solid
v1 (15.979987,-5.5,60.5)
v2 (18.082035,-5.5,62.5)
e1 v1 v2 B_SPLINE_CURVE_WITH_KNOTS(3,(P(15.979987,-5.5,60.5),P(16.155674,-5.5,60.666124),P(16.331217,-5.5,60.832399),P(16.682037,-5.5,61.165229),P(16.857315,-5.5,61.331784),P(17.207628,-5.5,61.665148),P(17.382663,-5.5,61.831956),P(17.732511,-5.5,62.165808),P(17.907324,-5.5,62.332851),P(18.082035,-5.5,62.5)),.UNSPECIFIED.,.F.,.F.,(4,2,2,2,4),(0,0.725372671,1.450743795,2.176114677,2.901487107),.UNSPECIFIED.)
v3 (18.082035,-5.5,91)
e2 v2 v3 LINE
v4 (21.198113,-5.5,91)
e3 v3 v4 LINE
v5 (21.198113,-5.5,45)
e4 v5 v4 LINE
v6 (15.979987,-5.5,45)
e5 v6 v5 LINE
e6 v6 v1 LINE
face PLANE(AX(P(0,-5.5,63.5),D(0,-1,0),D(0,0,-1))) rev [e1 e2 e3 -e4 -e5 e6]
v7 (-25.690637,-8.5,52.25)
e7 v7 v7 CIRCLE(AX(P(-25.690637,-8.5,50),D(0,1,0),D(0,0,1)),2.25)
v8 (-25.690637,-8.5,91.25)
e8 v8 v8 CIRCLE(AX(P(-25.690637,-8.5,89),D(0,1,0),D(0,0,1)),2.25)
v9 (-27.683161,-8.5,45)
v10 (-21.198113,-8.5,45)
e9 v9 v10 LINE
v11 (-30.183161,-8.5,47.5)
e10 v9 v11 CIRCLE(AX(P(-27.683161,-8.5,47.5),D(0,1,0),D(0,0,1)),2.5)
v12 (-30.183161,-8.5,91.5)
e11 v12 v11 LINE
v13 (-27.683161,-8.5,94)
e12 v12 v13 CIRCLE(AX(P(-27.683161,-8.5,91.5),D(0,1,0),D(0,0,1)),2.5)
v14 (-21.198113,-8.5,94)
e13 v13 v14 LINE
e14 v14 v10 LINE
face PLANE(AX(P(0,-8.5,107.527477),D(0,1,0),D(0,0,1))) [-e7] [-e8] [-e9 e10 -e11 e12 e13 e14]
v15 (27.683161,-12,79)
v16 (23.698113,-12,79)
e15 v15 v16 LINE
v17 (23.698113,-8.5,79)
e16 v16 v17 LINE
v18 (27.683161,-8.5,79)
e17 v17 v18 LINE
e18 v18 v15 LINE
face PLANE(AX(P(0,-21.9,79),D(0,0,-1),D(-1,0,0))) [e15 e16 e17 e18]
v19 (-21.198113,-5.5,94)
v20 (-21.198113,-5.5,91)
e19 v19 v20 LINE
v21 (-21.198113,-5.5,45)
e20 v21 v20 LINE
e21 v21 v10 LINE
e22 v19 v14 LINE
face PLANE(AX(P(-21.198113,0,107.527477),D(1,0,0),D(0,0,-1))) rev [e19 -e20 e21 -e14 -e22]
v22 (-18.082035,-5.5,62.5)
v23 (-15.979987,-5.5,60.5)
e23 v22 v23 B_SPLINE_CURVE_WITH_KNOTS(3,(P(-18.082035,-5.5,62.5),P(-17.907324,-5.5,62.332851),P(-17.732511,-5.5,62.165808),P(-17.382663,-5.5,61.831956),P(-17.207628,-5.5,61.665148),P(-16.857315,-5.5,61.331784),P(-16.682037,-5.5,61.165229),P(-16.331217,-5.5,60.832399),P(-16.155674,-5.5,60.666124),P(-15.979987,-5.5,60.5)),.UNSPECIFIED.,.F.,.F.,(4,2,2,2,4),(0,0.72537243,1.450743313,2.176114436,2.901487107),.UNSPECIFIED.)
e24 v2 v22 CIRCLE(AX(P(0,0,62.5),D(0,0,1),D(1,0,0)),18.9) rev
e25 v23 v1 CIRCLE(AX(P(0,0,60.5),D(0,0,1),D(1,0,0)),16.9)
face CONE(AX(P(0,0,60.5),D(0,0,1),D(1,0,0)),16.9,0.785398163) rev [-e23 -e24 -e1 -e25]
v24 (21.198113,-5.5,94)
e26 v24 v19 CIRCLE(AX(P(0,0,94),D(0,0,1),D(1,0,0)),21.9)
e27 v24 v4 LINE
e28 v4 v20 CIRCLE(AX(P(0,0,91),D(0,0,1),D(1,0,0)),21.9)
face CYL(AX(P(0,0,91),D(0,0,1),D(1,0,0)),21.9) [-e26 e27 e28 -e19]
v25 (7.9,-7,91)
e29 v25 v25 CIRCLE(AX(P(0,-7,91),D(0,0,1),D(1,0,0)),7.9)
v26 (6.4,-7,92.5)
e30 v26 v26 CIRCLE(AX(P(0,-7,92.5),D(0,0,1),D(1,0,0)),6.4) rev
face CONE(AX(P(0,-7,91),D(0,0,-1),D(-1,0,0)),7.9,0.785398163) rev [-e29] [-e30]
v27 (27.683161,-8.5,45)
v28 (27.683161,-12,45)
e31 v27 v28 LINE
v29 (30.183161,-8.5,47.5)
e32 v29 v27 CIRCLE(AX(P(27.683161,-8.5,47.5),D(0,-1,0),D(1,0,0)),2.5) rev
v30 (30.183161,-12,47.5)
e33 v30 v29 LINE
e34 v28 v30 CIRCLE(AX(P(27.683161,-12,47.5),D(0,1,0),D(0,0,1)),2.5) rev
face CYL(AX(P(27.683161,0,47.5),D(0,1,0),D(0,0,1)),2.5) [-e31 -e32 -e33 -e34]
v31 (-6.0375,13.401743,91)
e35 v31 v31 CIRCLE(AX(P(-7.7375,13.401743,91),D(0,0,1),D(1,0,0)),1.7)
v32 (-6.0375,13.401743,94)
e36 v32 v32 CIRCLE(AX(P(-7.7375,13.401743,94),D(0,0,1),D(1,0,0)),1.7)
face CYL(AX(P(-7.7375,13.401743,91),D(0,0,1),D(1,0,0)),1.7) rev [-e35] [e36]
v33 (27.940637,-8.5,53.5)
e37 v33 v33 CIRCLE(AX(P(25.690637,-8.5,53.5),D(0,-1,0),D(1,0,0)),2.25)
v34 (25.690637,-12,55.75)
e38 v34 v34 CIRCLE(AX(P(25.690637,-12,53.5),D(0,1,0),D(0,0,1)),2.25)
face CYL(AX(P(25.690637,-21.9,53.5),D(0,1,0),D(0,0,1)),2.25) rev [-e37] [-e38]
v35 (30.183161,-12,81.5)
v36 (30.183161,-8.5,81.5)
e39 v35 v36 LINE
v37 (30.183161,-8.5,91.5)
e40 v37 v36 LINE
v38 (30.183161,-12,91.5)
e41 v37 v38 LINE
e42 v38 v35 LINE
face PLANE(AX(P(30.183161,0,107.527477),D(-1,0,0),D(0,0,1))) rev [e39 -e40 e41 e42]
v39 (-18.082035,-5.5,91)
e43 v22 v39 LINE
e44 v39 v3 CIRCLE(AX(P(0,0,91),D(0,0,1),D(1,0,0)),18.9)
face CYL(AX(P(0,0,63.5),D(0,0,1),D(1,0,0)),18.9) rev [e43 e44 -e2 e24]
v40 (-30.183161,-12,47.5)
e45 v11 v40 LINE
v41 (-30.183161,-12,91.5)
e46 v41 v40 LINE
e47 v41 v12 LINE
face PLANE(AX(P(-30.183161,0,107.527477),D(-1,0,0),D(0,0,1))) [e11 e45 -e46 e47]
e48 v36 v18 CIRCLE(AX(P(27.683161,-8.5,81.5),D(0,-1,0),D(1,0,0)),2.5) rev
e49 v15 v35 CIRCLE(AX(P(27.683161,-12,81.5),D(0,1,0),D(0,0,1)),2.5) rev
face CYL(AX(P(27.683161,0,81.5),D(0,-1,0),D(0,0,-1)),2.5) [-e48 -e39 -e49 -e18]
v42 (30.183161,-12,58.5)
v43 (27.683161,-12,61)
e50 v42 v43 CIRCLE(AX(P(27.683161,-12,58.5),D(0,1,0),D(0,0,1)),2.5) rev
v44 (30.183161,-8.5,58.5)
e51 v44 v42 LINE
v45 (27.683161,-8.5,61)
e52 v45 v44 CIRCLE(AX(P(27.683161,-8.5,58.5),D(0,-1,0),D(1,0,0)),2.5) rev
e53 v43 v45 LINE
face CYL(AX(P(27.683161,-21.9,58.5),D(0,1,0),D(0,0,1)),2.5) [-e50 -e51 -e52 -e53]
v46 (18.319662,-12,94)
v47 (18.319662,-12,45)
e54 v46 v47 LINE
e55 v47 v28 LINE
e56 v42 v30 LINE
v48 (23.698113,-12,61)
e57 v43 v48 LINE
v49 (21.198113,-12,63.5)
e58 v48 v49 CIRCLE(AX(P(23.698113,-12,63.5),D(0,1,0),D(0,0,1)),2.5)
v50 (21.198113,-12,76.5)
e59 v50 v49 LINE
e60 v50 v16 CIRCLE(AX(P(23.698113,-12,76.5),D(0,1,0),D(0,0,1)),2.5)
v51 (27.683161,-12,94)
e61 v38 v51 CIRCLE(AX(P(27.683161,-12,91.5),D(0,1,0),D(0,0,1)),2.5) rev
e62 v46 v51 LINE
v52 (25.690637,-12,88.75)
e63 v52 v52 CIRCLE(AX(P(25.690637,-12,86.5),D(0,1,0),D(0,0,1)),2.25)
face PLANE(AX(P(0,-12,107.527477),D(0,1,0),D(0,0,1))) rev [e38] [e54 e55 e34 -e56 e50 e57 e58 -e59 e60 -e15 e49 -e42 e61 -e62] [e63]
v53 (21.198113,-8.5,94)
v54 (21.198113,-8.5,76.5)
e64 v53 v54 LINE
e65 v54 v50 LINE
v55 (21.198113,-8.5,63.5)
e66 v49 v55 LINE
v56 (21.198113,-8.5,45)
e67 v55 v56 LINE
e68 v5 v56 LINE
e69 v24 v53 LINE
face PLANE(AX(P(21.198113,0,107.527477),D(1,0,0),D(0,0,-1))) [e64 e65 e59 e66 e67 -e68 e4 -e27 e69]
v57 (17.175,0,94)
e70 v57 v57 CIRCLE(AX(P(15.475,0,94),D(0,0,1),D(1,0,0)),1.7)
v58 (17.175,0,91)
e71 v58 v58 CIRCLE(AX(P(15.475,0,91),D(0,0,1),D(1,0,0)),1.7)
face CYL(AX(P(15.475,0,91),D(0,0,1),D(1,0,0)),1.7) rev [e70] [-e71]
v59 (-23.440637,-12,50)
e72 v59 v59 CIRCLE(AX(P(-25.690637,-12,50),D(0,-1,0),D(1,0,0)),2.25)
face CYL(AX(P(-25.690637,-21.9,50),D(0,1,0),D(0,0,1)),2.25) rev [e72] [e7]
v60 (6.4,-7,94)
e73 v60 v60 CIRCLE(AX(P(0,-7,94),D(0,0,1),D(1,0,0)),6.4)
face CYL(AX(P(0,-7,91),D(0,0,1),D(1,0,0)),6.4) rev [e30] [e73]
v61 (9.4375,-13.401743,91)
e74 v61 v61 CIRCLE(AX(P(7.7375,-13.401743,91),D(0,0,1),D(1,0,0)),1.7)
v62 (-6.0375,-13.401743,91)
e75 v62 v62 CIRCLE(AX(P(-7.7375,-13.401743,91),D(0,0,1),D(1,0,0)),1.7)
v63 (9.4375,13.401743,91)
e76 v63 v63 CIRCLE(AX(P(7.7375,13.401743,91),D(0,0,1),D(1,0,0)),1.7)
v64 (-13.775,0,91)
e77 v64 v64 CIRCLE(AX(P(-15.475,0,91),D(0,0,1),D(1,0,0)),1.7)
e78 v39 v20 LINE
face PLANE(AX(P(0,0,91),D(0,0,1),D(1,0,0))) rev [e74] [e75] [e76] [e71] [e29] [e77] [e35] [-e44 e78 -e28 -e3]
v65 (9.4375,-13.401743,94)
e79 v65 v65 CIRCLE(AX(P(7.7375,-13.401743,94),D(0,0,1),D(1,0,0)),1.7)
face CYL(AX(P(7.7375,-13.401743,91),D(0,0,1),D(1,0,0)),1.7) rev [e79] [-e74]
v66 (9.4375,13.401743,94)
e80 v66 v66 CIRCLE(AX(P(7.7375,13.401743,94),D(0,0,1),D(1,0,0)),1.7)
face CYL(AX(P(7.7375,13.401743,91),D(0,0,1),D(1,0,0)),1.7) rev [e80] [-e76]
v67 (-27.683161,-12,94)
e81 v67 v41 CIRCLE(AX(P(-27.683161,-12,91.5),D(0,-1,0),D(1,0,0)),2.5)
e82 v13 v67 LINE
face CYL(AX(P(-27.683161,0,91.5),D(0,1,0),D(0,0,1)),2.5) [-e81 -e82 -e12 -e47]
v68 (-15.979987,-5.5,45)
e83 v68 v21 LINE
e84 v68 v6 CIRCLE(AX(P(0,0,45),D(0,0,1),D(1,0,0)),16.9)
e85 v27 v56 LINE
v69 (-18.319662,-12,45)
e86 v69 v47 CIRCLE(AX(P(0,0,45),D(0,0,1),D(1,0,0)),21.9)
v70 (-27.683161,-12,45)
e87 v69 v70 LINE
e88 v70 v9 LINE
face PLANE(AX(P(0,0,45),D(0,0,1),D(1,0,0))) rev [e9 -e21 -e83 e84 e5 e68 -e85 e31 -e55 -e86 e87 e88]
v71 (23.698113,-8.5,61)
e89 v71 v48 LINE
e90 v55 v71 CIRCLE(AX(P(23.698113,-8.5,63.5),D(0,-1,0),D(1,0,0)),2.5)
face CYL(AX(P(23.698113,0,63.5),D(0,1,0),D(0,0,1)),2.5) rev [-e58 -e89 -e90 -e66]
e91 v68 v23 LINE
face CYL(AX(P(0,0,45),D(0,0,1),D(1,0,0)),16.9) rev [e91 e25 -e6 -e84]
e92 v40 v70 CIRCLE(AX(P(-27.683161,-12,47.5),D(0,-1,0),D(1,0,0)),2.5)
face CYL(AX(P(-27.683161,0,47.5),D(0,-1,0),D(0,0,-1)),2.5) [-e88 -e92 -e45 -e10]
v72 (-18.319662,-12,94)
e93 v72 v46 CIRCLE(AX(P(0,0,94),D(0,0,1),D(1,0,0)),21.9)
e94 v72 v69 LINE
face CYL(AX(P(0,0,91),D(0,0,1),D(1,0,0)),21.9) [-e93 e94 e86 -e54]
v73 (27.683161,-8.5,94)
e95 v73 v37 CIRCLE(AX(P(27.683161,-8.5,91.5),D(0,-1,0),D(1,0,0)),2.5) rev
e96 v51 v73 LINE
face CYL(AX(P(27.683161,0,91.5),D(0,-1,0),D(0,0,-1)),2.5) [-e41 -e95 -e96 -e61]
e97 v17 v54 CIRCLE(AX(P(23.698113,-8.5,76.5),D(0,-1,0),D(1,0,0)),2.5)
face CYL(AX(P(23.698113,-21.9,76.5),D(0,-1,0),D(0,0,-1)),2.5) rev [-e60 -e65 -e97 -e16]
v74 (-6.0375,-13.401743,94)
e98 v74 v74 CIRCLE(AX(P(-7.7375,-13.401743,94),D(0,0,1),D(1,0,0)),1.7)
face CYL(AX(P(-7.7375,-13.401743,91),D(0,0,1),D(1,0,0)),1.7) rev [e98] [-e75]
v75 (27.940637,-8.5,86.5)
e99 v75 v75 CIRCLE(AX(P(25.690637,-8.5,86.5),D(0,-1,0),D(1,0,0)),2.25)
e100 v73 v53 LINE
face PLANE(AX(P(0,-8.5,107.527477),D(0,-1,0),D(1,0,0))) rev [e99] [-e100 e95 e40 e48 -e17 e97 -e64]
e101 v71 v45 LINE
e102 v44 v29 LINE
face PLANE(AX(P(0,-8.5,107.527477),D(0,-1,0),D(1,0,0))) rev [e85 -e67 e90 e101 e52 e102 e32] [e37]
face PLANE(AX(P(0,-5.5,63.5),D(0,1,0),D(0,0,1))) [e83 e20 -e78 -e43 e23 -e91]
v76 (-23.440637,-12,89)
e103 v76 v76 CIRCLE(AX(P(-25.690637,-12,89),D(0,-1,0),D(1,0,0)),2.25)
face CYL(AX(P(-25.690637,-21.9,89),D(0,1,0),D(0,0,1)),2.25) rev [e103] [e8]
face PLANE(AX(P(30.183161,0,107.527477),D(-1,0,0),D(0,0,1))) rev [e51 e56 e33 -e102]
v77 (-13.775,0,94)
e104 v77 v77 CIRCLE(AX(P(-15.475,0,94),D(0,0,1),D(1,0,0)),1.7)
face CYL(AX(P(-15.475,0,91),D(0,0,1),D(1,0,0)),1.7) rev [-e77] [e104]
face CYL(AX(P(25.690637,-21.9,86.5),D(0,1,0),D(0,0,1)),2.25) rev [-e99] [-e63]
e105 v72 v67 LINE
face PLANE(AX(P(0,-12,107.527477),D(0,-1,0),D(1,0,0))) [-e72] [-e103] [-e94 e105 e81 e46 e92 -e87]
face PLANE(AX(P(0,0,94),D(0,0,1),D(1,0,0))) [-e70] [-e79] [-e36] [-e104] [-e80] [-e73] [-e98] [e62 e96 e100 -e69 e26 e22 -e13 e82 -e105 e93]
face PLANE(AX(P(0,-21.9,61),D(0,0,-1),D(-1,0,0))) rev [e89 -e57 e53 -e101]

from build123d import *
from build123d.topology import SkipClean

# Parameters (mm, degrees)
BOSS_EXTRUDE1_START     = 94
SKETCH1_R               = 21.9
SKETCH1_R_2             = 1.7
SKETCH1_R_3             = 6.4
BOSS_EXTRUDE1_DEPTH     = 3
BOSS_EXTRUDE2_START     = 91
BOSS_EXTRUDE2_DEPTH     = 27.5
BOSS_EXTRUDE3_START     = 45
BOSS_EXTRUDE3_DEPTH     = 18.5
BOSS_EXTRUDE7_START     = 94
BOSS_EXTRUDE7_DEPTH     = 49
CUT_EXTRUDE5_DEPTH      = 104.301419283
CUT_EXTRUDE5_DEPTH_BACK = 104.301419283
SKETCH4_W               = 8.985048174
SKETCH4_H               = 18
SKETCH4_R               = 2.25
CHAMFER3_SIZE           = 3
CHAMFER4_SIZE           = 1.5
FILLET2_R               = 2.5


with BuildPart() as part:
    # Sketch1 → Boss-Extrude1 (new body)
    with BuildSketch(Plane.XY.offset(BOSS_EXTRUDE1_START)):
        Circle(SKETCH1_R)
        with Locations((15.475, 0)):
            Circle(SKETCH1_R_2, mode=Mode.SUBTRACT)
        with Locations((7.7375, -13.401743124)):
            Circle(SKETCH1_R_2, mode=Mode.SUBTRACT)
        with Locations((-7.7375, -13.401743124)):
            Circle(SKETCH1_R_2, mode=Mode.SUBTRACT)
        with Locations((-15.475, 0)):
            Circle(SKETCH1_R_2, mode=Mode.SUBTRACT)
        with Locations((-7.7375, 13.401743124)):
            Circle(SKETCH1_R_2, mode=Mode.SUBTRACT)
        with Locations((7.7375, 13.401743124)):
            Circle(SKETCH1_R_2, mode=Mode.SUBTRACT)
        with Locations((0, -7)):
            Circle(SKETCH1_R_3, mode=Mode.SUBTRACT)
    extrude(amount=-BOSS_EXTRUDE1_DEPTH)

    # Sketch1<5> → Boss-Extrude2 (add)
    with BuildSketch(Plane.XY.offset(BOSS_EXTRUDE2_START)):
        with BuildLine():
            ThreePointArc((18.319661569, -12), (19.330787418, -10.292262036), (20.183161298, -8.5))
            Line((20.183161298, -8.5), (16.880758277, -8.5))
            ThreePointArc((16.880758277, -8.5), (0, -18.9), (-16.880758277, -8.5))
            Line((-16.880758277, -8.5), (-20.183161298, -8.5))
            ThreePointArc((-20.183161298, -8.5), (-19.330787418, -10.292262036), (-18.319661569, -12))
            ThreePointArc((-18.319661569, -12), (0, -21.9), (18.319661569, -12))
        make_face()
        with BuildLine():
            Line((-20.183161298, -8.5), (-16.880758277, -8.5))
            ThreePointArc((-16.880758277, -8.5), (-17.545632887, -7.025721786), (-18.082035284, -5.5))
            Line((-18.082035284, -5.5), (-21.198113124, -5.5))
            ThreePointArc((-21.198113124, -5.5), (-20.744938375, -7.018371022), (-20.183161298, -8.5))
        make_face()
        with BuildLine():
            Line((16.880758277, -8.5), (20.183161298, -8.5))
            ThreePointArc((20.183161298, -8.5), (20.744938375, -7.018371022), (21.198113124, -5.5))
            Line((21.198113124, -5.5), (18.082035284, -5.5))
            ThreePointArc((18.082035284, -5.5), (17.545632887, -7.025721786), (16.880758277, -8.5))
        make_face()
    extrude(amount=-BOSS_EXTRUDE2_DEPTH)

    # Sketch1<6> → Boss-Extrude3 (add)
    with SkipClean():  # the faces are left unmerged after this step: merging them gives an invalid solid
        with BuildSketch(Plane.XY.offset(BOSS_EXTRUDE3_START)):
            with BuildLine():
                Line((21.198113124, -5.5), (15.979987484, -5.5))
                ThreePointArc((15.979987484, -5.5), (0, -16.9), (-15.979987484, -5.5))
                Line((-15.979987484, -5.5), (-21.198113124, -5.5))
                ThreePointArc((-21.198113124, -5.5), (0, -21.9), (21.198113124, -5.5))
            make_face()
        extrude(amount=BOSS_EXTRUDE3_DEPTH)

    # Sketch1<11> → Boss-Extrude7 (add)
    with SkipClean():  # the faces are left unmerged after this step: merging them gives an invalid solid
        with BuildSketch(Plane.XY.offset(BOSS_EXTRUDE7_START)):
            with BuildLine():
                ThreePointArc((21.198113124, -5.5), (20.024388359, -8.867574124), (18.319661569, -12))
                Line((18.319661569, -12), (30.183161298, -12))
                Line((30.183161298, -12), (30.183161298, -8.5))
                Line((30.183161298, -8.5), (21.198113124, -8.5))
                Line((21.198113124, -8.5), (21.198113124, -5.5))
            make_face()
            with BuildLine():
                Line((-30.183161298, -12), (-18.319661569, -12))
                ThreePointArc((-18.319661569, -12), (-20.024388359, -8.867574124), (-21.198113124, -5.5))
                Line((-21.198113124, -5.5), (-21.198113124, -8.5))
                Line((-21.198113124, -8.5), (-30.183161298, -8.5))
                Line((-30.183161298, -8.5), (-30.183161298, -12))
            make_face()
        extrude(amount=-BOSS_EXTRUDE7_DEPTH)

    # Sketch4 → Cut-Extrude5 (cut, two sides: drawn at the far end of the back side and taken through both)
    with SkipClean():  # the faces are left unmerged after this step: merging them gives an invalid solid
        with BuildSketch(Plane(origin=(0, -8.5, 0), x_dir=(1, 0, 0), z_dir=(0, 1, 0)).offset(-CUT_EXTRUDE5_DEPTH_BACK)):
            with Locations((25.690637211, -70)):
                Rectangle(SKETCH4_W, SKETCH4_H)
            with Locations(Location((-25.690637211, -50, 0), (0, 0, 270))):
                Circle(SKETCH4_R)
            with Locations(Location((-25.690637211, -89, 0), (0, 0, 270))):
                Circle(SKETCH4_R)
            with Locations(Location((25.690637211, -86.5, 0), (0, 0, 270))):
                Circle(SKETCH4_R)
            with Locations(Location((25.690637211, -53.5, 0), (0, 0, 270))):
                Circle(SKETCH4_R)
        extrude(amount=CUT_EXTRUDE5_DEPTH + CUT_EXTRUDE5_DEPTH_BACK, mode=Mode.SUBTRACT)

    # Chamfer3
    # the kernel refuses this chamfer: 3 mm, written as the material it takes off along each edge
    with BuildSketch(Plane(origin=(0, 0, 63.5), x_dir=(0.9921367643584464, 0.1251584627915844, 0), z_dir=(-0.1251584627915844, 0.9921367643584464, 0))) as chamfer3_piece_1_section:
        Polygon((16.9 + CHAMFER3_SIZE, 0), (16.9, CHAMFER3_SIZE), (16.9, 0), align=None)
    chamfer3_piece_1 = revolve(axis=Axis((0, 0, 63.5), (0, 0, -1)), revolution_arc=194.379813793, mode=Mode.PRIVATE)
    chamfer3_piece_1 = chamfer3_piece_1 & Plane(origin=(0, 0, 61.502732277), x_dir=(0.8931618135876879, -0.4497354497354555, 0), z_dir=(0, 0, 1)) * Cylinder(18.9, 80, mode=Mode.PRIVATE)
    add(chamfer3_piece_1, mode=Mode.SUBTRACT)

    # Chamfer4
    chamfer4_edges = [part.edges().sort_by_distance(p)[0] for p in [
        (-6.4, -7, 91),
    ]]
    chamfer(chamfer4_edges, length=CHAMFER4_SIZE)

    # Fillet2
    fillet2_edges = [part.edges().sort_by_distance(p)[0] for p in [
        (21.198113124, -10.25, 79),
        (21.198113124, -10.25, 61),
        (30.183161298, -10.25, 61),
        (30.183161298, -10.25, 79),
        (-30.183161298, -10.25, 45),
        (-30.183161298, -10.25, 94),
        (30.183161298, -10.25, 45),
        (30.183161298, -10.25, 94),
    ]]
    fillet(fillet2_edges, radius=FILLET2_R)


solid = part.part
